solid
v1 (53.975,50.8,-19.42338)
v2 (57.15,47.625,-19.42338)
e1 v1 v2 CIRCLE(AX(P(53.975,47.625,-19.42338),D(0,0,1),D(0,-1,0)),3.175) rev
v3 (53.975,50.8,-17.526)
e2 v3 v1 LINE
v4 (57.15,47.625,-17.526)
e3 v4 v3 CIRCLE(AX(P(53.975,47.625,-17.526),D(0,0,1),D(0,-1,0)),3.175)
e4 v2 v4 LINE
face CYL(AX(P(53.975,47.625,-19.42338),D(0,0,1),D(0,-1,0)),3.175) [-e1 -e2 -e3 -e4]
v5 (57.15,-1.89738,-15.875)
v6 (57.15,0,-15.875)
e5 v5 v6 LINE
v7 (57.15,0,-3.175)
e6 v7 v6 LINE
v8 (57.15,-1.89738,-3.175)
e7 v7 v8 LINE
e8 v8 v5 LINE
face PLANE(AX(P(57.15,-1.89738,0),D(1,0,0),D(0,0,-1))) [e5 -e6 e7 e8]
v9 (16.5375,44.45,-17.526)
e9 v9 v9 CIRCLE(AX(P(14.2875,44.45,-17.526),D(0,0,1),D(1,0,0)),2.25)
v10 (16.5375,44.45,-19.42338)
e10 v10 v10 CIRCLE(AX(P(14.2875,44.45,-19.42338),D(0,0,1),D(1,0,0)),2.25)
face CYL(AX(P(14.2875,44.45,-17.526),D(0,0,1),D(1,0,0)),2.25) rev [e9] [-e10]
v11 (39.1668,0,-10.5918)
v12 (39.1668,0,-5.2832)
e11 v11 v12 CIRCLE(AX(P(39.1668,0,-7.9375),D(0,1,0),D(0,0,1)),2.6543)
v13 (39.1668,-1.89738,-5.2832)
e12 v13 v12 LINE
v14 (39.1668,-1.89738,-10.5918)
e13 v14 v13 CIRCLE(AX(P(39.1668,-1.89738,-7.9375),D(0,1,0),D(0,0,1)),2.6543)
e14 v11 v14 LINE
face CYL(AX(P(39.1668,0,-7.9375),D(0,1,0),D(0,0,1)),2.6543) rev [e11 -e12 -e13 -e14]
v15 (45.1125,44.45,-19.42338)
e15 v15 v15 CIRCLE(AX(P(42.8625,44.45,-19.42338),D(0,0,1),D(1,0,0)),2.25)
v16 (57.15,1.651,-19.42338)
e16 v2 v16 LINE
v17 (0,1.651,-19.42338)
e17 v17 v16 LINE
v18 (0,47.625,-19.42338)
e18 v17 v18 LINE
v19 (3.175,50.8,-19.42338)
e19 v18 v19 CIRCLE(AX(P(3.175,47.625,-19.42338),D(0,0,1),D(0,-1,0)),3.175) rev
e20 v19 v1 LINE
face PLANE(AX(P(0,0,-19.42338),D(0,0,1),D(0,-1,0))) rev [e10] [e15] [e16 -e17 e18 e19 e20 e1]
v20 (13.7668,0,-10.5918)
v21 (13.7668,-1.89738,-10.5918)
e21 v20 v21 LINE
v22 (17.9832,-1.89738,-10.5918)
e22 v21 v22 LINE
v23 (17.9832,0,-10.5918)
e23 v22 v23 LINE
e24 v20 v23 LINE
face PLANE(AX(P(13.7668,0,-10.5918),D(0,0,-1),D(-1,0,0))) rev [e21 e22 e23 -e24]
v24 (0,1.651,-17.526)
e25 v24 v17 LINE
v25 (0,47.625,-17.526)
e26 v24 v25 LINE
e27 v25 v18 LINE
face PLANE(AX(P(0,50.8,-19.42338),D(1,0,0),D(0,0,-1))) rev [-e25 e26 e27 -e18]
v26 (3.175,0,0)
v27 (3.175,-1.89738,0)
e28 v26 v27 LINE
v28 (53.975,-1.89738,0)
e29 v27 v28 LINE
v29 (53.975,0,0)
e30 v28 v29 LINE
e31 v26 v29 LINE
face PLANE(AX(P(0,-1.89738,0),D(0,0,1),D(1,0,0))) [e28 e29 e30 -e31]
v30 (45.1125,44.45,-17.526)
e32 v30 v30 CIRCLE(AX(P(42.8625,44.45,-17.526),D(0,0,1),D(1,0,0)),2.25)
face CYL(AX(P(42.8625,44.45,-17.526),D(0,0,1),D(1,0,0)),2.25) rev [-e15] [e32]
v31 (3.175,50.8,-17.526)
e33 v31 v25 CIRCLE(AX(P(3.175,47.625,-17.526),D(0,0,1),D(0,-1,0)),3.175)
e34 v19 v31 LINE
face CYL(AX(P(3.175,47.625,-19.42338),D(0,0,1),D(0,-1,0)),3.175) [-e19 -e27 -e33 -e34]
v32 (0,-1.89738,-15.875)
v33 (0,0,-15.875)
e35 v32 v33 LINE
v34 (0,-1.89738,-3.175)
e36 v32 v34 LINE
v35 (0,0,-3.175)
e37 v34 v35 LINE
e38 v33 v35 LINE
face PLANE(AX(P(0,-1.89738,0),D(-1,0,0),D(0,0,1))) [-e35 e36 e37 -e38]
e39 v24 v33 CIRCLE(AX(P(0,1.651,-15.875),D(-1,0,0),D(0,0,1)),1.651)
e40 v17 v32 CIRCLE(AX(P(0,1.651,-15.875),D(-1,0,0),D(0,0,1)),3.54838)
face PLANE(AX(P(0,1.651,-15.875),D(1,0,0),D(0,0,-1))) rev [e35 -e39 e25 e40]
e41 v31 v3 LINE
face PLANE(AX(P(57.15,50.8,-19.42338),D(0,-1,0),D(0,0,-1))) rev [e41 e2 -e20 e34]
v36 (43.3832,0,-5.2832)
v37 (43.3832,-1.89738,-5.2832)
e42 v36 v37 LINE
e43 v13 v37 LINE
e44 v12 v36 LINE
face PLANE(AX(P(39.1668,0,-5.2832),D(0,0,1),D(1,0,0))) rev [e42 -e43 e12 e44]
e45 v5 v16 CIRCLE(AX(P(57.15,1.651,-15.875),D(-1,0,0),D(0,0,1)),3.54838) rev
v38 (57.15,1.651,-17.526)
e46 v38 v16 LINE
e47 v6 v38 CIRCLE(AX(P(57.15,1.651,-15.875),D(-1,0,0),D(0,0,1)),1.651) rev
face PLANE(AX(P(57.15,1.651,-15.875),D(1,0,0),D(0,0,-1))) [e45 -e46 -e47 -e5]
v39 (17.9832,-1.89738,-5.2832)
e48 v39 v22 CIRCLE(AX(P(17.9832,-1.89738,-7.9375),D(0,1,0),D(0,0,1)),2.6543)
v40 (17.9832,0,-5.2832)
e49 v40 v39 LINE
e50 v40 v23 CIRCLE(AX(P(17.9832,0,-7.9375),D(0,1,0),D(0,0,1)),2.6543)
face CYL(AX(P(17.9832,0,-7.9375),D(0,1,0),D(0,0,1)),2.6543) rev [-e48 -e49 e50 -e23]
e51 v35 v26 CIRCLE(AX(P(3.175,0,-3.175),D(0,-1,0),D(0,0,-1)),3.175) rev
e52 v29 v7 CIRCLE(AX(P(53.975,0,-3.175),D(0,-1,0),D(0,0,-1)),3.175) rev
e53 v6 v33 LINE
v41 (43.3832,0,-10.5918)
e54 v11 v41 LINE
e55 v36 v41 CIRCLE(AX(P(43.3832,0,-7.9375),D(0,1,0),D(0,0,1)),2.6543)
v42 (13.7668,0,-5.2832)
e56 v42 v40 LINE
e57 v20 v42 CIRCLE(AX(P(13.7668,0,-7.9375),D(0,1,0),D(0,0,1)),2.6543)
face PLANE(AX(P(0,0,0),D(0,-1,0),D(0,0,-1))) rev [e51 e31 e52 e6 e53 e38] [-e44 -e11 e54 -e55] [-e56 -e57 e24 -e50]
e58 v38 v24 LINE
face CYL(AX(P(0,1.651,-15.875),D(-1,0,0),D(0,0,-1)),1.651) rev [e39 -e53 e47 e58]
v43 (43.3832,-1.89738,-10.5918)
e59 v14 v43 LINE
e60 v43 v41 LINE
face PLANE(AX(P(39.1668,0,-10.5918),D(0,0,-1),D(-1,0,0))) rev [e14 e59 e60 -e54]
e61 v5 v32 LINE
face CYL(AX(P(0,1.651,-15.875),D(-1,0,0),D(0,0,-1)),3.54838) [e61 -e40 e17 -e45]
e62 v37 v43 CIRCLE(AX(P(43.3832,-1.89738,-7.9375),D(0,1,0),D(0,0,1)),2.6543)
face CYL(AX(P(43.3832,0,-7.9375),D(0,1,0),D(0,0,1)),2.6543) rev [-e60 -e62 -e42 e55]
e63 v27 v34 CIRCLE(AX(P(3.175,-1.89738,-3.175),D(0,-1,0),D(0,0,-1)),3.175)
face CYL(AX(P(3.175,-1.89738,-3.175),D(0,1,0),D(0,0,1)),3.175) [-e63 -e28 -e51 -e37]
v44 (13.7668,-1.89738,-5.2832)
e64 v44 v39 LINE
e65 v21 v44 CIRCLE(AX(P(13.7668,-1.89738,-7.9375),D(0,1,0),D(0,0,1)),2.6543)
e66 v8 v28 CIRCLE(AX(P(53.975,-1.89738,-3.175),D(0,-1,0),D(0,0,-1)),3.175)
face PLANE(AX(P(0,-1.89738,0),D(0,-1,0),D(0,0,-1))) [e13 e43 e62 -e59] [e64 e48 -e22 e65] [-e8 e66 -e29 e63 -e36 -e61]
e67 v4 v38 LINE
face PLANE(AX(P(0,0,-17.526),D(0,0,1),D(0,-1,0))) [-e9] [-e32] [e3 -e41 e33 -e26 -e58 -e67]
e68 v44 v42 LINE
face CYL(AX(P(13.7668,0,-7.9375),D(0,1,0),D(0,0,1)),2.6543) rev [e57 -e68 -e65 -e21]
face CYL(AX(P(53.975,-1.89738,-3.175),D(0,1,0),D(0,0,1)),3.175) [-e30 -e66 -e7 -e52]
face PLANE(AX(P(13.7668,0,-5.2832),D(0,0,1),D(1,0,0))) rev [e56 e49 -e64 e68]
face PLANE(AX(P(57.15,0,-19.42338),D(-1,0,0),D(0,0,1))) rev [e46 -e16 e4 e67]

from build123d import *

# Parameters (mm, degrees)
SKETCH1_W                      = 57.15
SKETCH1_H                      = 15.875
BASE_FLANGE1_DEPTH             = 1.89738
EDGE_FLANGE1_DEPTH             = 57.15
F_4_START                      = -1.89738
F_4_0_209_DIAMETER_SLOT1_DEPTH = 1.89738
F_4_5_4_5_DIAMETER_HOLE1_D     = 4.5
FILLET1_R                      = 3.175


# Read off the part's stored shape, not the designer's step: #4 (0.209) Diameter Slot1
# Sheet-metal steps are written as plain solids
with BuildPart() as part:
    # Sketch1 → Base-Flange1 (new body)
    with BuildSketch(Plane(origin=(0, 0, 0), x_dir=(1, 0, 0), z_dir=(0, 1, 0))):
        with Locations((28.575, 7.9375)):
            Rectangle(SKETCH1_W, SKETCH1_H)
    extrude(amount=-BASE_FLANGE1_DEPTH)

    # Edge-Flange1 section (across the edge) → Edge-Flange1 (add)
    with BuildSketch(Plane(origin=(57.15, 0, -17.526), x_dir=(0, 0, 1), z_dir=(-1, 0, 0))):
        with BuildLine():
            Line((-1.89738, 1.651), (-1.89738, 50.8))
            Line((-1.89738, 50.8), (0, 50.8))
            Line((0, 50.8), (0, 1.651))
            ThreePointArc((0, 1.651), (0.483566704, 0.483566704), (1.651, 0))
            Line((1.651, 0), (1.651, -1.89738))
            ThreePointArc((1.651, -1.89738), (-0.85808356, -0.85808356), (-1.89738, 1.651))
        make_face()
    extrude(amount=EDGE_FLANGE1_DEPTH)

    # #4 (0.209) Diameter Slot1 outline → #4 (0.209) Diameter Slot1 (cut)
    with BuildSketch(Plane(origin=(0, 0, 0), x_dir=(1, 0, 0), z_dir=(0, 1, 0)).offset(F_4_START)):
        with BuildLine():
            Line((39.1668, 5.2832), (43.3832, 5.2832))
            ThreePointArc((43.3832, 5.2832), (46.0375, 7.9375), (43.3832, 10.5918))
            Line((43.3832, 10.5918), (39.1668, 10.5918))
            ThreePointArc((39.1668, 10.5918), (36.5125, 7.9375), (39.1668, 5.2832))
        make_face()
        with BuildLine():
            ThreePointArc((17.9832, 5.2832), (20.6375, 7.9375), (17.9832, 10.5918))
            Line((17.9832, 10.5918), (13.7668, 10.5918))
            ThreePointArc((13.7668, 10.5918), (11.1125, 7.9375), (13.7668, 5.2832))
            Line((13.7668, 5.2832), (17.9832, 5.2832))
        make_face()
    extrude(amount=F_4_0_209_DIAMETER_SLOT1_DEPTH, mode=Mode.SUBTRACT)

    # Ø4.5 (4.5) Diameter Hole1 (through all)
    with Locations(Plane.XY.offset(-17.526)):
        with Locations((14.2875, 44.45), (42.8625, 44.45)):
            Hole(F_4_5_4_5_DIAMETER_HOLE1_D / 2)

    # Fillet1
    fillet1_edges = [part.edges().sort_by_distance(p)[0] for p in [
        (57.15, 50.8, -18.47469),
        (0, 50.8, -18.47469),
        (57.15, -0.94869, 0),
        (0, -0.94869, 0),
    ]]
    fillet(fillet1_edges, radius=FILLET1_R)


solid = part.part
